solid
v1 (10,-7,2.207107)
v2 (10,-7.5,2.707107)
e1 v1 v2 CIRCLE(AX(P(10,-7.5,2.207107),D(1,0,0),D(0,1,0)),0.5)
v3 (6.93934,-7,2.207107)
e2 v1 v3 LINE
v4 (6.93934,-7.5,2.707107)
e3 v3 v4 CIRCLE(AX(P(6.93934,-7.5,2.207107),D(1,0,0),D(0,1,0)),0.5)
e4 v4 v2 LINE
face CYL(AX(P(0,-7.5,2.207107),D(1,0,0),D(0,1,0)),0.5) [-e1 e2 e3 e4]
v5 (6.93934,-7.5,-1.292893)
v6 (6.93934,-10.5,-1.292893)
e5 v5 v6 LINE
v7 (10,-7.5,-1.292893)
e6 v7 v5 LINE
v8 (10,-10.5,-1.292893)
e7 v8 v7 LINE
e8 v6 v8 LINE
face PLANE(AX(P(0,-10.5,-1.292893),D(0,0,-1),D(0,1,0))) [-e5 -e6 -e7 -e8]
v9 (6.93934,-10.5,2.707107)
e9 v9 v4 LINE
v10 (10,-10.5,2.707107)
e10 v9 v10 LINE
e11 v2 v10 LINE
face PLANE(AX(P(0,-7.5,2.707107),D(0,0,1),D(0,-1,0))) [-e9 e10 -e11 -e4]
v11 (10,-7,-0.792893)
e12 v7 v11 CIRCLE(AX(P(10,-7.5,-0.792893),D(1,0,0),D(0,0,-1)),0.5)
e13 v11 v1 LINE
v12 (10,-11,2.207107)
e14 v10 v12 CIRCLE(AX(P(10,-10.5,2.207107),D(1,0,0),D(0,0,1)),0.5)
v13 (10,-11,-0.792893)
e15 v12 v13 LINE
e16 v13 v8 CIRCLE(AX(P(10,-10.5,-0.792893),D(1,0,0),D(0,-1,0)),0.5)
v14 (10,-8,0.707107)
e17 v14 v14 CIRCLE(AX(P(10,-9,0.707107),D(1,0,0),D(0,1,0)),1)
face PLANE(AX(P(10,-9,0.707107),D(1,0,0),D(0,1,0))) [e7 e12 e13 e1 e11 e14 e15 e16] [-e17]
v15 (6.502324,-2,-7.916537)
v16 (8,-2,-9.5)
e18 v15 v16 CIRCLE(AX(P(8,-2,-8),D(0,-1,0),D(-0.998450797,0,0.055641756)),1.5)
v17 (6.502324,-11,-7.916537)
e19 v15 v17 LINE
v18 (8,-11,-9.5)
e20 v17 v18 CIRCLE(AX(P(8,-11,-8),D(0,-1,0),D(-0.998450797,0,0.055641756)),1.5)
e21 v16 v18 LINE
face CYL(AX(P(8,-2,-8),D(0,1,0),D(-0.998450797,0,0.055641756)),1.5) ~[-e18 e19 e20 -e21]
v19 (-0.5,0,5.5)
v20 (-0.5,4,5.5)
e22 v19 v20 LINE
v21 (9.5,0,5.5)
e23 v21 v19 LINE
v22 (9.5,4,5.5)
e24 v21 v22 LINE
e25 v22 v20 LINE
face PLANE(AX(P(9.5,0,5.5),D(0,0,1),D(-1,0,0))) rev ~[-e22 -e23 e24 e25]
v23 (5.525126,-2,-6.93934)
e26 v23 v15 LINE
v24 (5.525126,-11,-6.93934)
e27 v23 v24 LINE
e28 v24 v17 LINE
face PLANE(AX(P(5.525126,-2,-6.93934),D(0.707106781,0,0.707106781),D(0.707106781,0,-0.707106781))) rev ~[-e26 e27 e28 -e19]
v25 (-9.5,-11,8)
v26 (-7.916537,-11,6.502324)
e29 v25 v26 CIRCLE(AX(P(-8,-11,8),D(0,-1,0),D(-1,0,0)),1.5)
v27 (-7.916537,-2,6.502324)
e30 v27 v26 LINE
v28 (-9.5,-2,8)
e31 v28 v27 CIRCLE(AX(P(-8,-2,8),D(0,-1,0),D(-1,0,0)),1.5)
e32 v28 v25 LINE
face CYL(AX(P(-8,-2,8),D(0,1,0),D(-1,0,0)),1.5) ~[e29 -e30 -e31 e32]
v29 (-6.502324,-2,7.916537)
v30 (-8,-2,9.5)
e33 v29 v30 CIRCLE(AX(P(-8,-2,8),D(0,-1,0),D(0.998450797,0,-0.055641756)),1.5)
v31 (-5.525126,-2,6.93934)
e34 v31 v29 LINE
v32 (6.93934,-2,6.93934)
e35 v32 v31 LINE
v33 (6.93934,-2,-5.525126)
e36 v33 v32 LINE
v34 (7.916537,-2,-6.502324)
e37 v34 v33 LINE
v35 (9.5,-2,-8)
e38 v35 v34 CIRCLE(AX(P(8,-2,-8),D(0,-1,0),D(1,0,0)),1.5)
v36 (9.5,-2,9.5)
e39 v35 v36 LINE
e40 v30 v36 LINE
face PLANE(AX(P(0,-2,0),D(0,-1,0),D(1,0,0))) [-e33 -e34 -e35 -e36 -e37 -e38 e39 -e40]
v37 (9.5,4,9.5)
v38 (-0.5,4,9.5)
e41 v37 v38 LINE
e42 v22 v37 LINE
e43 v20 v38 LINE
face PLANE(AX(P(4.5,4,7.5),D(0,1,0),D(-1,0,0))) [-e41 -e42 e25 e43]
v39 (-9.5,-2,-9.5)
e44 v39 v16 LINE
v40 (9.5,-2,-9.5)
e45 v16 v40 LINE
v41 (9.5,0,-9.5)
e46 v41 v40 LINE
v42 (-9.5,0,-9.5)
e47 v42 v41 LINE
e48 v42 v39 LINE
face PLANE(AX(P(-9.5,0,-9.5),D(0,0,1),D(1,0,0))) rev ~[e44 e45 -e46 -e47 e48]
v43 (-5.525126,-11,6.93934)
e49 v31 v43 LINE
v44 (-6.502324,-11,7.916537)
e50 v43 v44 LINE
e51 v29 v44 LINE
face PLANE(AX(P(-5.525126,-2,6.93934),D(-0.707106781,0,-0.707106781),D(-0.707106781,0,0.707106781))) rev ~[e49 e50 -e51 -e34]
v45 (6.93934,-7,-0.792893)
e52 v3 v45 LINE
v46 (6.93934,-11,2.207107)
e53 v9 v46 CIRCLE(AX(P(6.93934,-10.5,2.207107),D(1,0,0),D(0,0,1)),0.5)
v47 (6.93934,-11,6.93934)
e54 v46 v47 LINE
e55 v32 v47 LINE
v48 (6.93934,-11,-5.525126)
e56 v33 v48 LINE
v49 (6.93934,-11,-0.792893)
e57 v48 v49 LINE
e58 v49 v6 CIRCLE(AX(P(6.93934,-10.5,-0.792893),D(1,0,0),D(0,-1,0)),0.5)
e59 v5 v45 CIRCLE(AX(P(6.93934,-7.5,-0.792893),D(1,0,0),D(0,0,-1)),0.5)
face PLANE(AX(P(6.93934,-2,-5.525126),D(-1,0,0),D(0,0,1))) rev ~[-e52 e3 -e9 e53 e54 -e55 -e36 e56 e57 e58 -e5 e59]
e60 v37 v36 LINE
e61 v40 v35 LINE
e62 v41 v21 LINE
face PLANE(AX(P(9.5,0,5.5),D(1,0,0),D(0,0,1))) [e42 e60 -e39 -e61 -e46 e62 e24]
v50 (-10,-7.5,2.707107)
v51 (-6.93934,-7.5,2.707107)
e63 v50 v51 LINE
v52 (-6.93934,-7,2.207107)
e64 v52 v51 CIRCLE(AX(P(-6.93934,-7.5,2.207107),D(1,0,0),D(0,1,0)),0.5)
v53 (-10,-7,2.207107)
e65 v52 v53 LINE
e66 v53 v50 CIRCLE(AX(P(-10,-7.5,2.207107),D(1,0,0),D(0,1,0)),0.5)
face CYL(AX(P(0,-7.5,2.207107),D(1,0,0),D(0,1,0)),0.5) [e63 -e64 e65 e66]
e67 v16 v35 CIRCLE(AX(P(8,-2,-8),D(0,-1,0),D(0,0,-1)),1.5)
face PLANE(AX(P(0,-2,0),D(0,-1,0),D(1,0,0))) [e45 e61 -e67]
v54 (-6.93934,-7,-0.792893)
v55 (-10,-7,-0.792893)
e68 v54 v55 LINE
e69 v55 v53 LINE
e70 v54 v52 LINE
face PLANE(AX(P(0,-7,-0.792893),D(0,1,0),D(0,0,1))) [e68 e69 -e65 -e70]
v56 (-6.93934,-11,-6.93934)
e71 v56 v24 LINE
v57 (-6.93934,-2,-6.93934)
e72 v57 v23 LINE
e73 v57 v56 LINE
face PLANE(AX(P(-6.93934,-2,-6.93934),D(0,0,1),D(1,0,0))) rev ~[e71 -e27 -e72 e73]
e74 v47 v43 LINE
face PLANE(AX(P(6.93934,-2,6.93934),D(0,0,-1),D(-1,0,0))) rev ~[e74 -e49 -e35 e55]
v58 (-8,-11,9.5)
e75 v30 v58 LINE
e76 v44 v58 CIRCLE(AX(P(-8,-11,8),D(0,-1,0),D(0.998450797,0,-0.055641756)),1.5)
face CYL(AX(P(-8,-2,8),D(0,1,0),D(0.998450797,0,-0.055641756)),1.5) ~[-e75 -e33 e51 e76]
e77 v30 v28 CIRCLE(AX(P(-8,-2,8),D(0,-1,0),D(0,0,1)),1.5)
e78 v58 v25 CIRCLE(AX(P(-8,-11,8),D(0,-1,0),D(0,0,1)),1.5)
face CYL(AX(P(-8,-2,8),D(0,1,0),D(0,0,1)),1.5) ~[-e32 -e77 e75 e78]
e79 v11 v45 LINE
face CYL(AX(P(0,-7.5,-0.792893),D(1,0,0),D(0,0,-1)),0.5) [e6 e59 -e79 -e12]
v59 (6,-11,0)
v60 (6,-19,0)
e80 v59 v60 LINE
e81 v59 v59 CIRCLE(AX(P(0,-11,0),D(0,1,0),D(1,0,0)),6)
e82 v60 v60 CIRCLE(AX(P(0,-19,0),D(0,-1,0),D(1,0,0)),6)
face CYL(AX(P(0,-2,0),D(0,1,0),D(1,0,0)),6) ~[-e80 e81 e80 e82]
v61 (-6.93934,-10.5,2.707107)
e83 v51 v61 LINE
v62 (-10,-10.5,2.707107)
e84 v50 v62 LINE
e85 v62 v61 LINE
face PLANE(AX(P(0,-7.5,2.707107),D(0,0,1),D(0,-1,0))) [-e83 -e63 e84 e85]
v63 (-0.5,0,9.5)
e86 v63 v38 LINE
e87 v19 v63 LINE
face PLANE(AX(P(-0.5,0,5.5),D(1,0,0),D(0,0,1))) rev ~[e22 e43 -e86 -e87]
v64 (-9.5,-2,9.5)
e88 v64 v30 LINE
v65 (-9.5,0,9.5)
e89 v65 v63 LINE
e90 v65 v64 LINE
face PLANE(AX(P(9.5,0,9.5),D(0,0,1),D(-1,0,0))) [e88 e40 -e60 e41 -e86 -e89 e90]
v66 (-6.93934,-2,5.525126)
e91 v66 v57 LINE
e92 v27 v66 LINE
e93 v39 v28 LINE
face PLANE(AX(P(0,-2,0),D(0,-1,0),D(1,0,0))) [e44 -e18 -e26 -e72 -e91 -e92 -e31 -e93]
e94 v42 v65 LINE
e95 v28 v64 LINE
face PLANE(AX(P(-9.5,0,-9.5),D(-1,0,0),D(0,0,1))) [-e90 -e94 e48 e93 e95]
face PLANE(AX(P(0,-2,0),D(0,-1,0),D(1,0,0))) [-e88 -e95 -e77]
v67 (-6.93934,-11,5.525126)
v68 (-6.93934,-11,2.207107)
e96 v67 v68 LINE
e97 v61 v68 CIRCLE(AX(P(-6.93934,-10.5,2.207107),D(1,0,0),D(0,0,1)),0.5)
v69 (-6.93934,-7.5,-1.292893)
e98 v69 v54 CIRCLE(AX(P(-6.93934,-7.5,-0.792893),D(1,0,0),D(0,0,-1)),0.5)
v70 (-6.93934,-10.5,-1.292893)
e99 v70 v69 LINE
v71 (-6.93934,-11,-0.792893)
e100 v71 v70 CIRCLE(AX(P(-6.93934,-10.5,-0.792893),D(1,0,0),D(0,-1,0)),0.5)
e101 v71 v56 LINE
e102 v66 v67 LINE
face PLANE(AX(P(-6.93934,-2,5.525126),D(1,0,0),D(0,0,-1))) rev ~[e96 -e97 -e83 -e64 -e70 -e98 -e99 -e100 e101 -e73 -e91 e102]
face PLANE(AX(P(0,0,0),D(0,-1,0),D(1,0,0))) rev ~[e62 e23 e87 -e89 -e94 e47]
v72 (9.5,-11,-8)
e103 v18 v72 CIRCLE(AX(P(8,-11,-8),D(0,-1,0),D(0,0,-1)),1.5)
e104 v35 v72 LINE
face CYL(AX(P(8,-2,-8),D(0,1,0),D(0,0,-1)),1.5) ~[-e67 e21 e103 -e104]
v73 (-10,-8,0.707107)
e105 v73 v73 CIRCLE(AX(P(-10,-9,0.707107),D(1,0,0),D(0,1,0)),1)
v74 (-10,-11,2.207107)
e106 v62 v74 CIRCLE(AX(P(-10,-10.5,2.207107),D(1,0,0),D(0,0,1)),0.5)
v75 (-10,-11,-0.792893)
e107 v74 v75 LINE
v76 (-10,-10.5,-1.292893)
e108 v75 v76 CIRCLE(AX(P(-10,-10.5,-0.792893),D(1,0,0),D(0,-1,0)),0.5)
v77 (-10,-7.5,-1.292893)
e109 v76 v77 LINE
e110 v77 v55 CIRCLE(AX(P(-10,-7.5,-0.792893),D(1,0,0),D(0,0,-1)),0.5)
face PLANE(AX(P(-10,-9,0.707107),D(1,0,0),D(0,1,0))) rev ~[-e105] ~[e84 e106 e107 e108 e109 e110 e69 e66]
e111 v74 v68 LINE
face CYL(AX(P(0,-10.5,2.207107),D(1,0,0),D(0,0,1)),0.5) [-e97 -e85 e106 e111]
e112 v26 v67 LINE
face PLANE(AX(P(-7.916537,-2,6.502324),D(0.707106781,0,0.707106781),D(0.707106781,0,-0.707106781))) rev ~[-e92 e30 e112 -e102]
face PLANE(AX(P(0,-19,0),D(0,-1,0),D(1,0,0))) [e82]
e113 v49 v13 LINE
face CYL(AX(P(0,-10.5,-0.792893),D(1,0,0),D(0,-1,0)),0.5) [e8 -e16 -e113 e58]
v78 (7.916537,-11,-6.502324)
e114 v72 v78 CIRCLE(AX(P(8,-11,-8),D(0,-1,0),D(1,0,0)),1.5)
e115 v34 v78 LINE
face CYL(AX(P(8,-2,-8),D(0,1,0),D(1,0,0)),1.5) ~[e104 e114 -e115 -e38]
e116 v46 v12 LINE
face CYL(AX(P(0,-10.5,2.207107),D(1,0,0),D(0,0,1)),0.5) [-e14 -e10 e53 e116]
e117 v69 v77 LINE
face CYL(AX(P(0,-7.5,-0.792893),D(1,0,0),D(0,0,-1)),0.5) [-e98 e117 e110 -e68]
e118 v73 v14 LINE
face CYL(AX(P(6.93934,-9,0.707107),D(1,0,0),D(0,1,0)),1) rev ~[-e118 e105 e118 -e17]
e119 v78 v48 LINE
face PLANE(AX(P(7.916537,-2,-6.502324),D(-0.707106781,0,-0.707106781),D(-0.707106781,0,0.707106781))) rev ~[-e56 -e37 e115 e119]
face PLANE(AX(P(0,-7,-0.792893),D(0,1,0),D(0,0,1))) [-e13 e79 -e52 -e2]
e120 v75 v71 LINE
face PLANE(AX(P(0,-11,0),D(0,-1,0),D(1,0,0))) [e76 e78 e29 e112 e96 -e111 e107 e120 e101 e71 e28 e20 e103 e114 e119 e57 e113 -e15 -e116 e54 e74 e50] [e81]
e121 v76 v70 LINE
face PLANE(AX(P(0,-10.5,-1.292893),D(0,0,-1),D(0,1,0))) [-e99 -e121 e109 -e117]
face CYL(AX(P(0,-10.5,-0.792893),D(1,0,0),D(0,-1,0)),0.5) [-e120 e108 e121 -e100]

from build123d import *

# Parameters (mm, degrees)
F0_W      = 19
F0_H      = 19
F1_DEPTH  = 2
F4_DEPTH  = 9
F2_R      = 6
F5_DEPTH  = 17
F7_DEPTH  = 10
F10_R     = 1
F11_DEPTH = 20
F12_W     = 10
F12_H     = 4
F13_DEPTH = 4


# Not quite as in the source:
# - a feature of the source that left no trace in its solid (it failed there, or was rolled back) is left out
# - a feature names something its author has since deleted; it is built from what else it names


with BuildPart() as f1:
    # F0 (on Front) → F1 (new body)
    with BuildSketch(Plane.XZ):
        Rectangle(F0_W, F0_H)
    extrude(amount=F1_DEPTH)

    # F3 (on face) → F4 (join)
    with BuildSketch(Plane.XZ.offset(2)):
        with BuildLine():
            Line((-5.5251262658, 6.9393398282), (-6.5023238038, 7.9165373661))
            ThreePointArc((-6.5023238038, 7.9165373661), (-6.9102307697, 9.0307293654), (-8, 9.5))
            ThreePointArc((-8, 9.5), (-9.0606601718, 9.0606601718), (-9.5, 8))
            ThreePointArc((-9.5, 8), (-9.0307293654, 6.9102307697), (-7.9165373661, 6.5023238038))
            Line((-7.9165373661, 6.5023238038), (-6.9393398282, 5.5251262658))
            Line((-6.9393398282, 5.5251262658), (-6.9393398282, -6.9393398282))
            Line((-6.9393398282, -6.9393398282), (5.5251262658, -6.9393398282))
            Line((5.5251262658, -6.9393398282), (6.5023238038, -7.9165373661))
            ThreePointArc((6.5023238038, -7.9165373661), (6.9102307697, -9.0307293654), (8, -9.5))
            ThreePointArc((8, -9.5), (9.0606601718, -9.0606601718), (9.5, -8))
            ThreePointArc((9.5, -8), (9.0307293654, -6.9102307697), (7.9165373661, -6.5023238038))
            Line((7.9165373661, -6.5023238038), (6.9393398282, -5.5251262658))
            Line((6.9393398282, -5.5251262658), (6.9393398282, 6.9393398282))
            Line((6.9393398282, 6.9393398282), (-5.5251262658, 6.9393398282))
        make_face()
    extrude(amount=F4_DEPTH)

    # F2 (on face) → F5 (join)
    with BuildSketch(Plane.XZ.offset(2)):
        Circle(F2_R)
    extrude(amount=F5_DEPTH)

    # F6 (on Right) → F7 (join, symmetric)
    with BuildSketch(Plane.YZ):
        with BuildLine():
            ThreePointArc((-7, 2.2071067812), (-7.1464466094, 2.5606601718), (-7.5, 2.7071067812))
            Line((-7.5, 2.7071067812), (-10.5, 2.7071067812))
            ThreePointArc((-10.5, 2.7071067812), (-10.8535533906, 2.5606601718), (-11, 2.2071067812))
            Line((-11, 2.2071067812), (-11, -0.7928932188))
            ThreePointArc((-11, -0.7928932188), (-10.8535533906, -1.1464466094), (-10.5, -1.2928932188))
            Line((-10.5, -1.2928932188), (-7.5, -1.2928932188))
            ThreePointArc((-7.5, -1.2928932188), (-7.1464466094, -1.1464466094), (-7, -0.7928932188))
            Line((-7, -0.7928932188), (-7, 2.2071067812))
        make_face()
    extrude(amount=F7_DEPTH, both=True)

    # F10 (on face) → F11 (cut, symmetric)
    with BuildSketch(Plane.YZ.offset(6.9393398282)):
        with Locations((-9, 0.7071067812)):
            Circle(F10_R)
    extrude(amount=F11_DEPTH, both=True, mode=Mode.SUBTRACT)

    # F12 (on face) → F13 (join)
    with BuildSketch(Plane(origin=(0, 0, 0), x_dir=(-1, 0, 0), z_dir=(0, 1, 0))):
        with Locations((-4.5, 7.5)):
            Rectangle(F12_W, F12_H)
    extrude(amount=F13_DEPTH)


solid = f1.part
